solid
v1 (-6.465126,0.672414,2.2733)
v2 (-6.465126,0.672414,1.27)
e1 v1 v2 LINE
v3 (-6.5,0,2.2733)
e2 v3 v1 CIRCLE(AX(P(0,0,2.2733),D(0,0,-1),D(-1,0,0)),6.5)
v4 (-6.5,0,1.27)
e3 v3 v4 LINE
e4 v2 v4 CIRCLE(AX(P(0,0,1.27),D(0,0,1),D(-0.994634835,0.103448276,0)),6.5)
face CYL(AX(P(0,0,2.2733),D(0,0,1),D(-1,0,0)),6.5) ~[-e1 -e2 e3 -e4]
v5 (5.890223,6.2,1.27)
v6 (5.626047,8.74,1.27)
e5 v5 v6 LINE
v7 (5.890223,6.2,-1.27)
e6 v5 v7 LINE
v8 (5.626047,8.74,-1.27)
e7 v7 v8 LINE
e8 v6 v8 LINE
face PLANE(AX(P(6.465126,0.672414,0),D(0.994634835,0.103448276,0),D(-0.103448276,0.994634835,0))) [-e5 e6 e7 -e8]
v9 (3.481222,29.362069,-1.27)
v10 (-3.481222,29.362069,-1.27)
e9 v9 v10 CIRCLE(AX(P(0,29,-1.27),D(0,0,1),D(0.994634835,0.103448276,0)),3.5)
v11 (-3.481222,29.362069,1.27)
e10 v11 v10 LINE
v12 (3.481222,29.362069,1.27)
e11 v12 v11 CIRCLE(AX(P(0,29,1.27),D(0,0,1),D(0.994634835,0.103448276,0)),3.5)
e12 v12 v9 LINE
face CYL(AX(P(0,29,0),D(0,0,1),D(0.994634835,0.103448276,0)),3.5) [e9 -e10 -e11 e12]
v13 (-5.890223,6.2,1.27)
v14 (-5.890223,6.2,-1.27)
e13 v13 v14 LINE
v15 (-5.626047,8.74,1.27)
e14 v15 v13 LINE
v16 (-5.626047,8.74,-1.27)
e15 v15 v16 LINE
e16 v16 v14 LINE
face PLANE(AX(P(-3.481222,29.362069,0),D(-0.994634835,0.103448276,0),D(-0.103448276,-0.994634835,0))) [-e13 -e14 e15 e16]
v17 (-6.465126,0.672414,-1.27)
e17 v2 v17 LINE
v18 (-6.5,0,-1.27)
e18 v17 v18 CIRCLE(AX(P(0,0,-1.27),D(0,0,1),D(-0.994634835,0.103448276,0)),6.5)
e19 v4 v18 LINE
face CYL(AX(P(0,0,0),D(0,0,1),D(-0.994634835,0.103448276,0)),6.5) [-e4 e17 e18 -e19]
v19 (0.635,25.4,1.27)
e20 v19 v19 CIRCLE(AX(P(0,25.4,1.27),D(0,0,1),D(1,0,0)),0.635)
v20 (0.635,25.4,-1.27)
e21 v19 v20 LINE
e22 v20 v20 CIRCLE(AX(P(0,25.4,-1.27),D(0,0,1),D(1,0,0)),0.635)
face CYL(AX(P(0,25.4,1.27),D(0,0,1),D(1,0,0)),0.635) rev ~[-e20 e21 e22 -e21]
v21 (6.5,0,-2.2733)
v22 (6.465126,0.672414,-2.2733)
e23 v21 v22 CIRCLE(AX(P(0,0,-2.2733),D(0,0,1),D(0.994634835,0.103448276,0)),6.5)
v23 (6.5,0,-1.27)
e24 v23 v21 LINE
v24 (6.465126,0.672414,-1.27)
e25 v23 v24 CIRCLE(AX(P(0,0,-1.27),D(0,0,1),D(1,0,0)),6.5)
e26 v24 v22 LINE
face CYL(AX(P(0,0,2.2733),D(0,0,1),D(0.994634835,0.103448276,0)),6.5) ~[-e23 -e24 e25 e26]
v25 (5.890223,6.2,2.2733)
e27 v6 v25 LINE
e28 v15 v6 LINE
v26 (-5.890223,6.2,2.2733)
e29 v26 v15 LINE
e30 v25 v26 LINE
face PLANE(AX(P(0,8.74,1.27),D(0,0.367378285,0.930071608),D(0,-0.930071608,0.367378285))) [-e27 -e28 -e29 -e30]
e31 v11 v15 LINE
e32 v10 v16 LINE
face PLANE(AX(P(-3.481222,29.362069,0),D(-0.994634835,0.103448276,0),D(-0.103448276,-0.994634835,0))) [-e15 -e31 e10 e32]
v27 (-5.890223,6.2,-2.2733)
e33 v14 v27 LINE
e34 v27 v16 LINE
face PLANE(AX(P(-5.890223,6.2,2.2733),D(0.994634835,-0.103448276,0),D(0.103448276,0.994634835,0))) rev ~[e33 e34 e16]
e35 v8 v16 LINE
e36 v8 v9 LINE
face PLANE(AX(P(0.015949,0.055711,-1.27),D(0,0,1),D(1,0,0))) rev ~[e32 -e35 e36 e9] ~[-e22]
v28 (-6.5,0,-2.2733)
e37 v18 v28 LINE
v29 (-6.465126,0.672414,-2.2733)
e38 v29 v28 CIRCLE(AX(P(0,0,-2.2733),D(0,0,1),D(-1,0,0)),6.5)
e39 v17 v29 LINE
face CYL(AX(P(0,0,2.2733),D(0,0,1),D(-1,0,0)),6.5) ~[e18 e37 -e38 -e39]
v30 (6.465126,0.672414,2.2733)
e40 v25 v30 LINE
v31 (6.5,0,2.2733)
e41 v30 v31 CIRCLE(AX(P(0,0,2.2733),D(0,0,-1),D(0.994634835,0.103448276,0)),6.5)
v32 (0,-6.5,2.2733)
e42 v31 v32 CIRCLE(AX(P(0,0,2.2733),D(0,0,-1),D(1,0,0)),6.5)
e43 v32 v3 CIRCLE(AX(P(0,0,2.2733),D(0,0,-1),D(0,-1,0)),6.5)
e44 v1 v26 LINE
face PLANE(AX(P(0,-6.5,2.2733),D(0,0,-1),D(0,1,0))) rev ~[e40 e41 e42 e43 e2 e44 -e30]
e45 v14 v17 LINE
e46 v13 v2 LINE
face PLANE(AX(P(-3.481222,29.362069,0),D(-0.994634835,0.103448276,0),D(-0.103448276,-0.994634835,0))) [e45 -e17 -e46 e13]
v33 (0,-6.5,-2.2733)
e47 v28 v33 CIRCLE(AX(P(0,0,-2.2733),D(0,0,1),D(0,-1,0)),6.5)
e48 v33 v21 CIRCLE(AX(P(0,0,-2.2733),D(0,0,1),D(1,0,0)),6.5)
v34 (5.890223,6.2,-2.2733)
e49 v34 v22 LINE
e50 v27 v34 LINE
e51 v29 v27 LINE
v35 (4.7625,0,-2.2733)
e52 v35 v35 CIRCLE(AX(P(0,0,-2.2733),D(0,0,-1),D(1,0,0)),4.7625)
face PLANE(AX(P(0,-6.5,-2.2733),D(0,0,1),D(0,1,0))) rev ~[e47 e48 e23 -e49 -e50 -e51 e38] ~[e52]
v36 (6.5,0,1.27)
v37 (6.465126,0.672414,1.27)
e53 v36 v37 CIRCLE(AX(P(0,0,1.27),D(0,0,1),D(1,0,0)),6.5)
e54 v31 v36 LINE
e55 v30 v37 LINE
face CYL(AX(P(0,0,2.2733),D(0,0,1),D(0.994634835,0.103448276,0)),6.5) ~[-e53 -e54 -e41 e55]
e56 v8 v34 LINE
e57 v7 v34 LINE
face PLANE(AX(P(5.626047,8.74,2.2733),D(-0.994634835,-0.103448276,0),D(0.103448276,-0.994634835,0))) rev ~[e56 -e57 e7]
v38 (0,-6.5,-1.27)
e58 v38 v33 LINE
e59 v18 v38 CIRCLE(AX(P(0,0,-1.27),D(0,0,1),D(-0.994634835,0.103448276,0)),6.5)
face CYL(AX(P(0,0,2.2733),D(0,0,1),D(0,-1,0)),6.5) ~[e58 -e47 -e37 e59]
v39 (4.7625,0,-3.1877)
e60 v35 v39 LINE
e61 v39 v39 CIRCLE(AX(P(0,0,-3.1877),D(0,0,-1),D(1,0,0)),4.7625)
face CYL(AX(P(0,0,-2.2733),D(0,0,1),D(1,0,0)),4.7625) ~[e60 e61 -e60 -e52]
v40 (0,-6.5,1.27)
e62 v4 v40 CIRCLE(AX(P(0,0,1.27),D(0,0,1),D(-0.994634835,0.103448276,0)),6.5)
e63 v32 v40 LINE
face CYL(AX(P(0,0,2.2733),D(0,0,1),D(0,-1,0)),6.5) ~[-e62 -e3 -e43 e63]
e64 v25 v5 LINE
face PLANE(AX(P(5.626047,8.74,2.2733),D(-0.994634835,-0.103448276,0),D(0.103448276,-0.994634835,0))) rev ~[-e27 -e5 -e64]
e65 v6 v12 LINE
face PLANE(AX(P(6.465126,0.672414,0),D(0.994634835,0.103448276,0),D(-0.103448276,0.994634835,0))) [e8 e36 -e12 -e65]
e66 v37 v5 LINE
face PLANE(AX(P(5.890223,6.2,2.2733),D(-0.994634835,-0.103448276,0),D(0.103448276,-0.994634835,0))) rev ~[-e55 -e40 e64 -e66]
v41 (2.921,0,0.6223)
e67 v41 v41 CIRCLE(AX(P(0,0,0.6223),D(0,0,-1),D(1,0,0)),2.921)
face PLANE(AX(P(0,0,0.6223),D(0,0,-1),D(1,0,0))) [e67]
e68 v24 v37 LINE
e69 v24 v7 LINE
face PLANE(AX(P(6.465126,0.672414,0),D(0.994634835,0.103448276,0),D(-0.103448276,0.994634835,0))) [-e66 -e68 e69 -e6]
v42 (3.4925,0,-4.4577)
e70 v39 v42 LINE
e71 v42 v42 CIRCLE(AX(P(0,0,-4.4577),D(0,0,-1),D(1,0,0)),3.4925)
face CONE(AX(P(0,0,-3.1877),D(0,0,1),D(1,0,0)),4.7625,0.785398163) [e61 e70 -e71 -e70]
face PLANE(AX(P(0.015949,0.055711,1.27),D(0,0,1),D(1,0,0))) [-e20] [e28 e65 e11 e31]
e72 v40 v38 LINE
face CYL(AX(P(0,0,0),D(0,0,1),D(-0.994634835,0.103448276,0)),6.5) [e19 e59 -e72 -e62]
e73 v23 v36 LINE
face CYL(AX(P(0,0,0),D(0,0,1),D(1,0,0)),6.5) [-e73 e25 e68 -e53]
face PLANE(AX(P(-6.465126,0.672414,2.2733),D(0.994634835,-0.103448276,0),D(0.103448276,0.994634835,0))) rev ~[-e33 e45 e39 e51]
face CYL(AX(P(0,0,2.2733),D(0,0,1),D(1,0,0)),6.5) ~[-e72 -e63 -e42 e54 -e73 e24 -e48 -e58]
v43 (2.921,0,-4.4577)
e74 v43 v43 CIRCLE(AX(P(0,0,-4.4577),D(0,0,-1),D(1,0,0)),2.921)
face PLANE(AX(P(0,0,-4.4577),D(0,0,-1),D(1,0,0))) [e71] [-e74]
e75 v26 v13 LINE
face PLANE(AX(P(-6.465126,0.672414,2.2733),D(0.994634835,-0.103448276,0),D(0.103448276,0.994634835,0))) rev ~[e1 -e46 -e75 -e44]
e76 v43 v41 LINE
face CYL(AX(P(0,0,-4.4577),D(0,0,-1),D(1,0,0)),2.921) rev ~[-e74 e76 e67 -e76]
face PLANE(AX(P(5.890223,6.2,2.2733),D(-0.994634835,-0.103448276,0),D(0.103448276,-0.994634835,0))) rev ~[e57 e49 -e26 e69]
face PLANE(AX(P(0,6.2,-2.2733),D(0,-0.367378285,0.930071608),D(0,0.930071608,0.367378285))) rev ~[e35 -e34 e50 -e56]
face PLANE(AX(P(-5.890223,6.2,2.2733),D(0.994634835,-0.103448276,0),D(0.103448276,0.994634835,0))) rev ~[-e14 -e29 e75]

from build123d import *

# Parameters (mm, degrees)
F1_DEPTH  = 1.27
F2_W      = 12.7
F2_H      = 1.0033
F3_DEPTH  = 6.5
F5_DEPTH  = 4.5476
F6_R      = 4.7625
F7_DEPTH  = 2.1844
F8_SIZE   = 1.27
F9_R      = 2.921
F10_DEPTH = 5.08
F11_R     = 0.635
F12_DEPTH = 25.4


# Not quite as in the source:
# - after a boolean that leaves OpenCascade's solid faulty, fix() repairs it


with BuildPart() as f1:
    # F0 (on Top) → F1 (new body, symmetric)
    with BuildSketch(Plane.XY):
        with BuildLine():
            ThreePointArc((-6.465126425, 0.6724137931), (-0.3366587573, -6.4912757514), (6.5, 0))
            ThreePointArc((6.5, 0), (6.4912757514, 0.3366587573), (6.465126425, 0.6724137931))
            ThreePointArc((6.465126425, 0.6724137931), (0, 6.5), (-6.465126425, 0.6724137931))
        make_face()
        with BuildLine():
            ThreePointArc((-6.465126425, 0.6724137931), (0, 6.5), (6.465126425, 0.6724137931))
            Line((6.465126425, 0.6724137931), (3.4812219211, 29.3620689655))
            ThreePointArc((3.4812219211, 29.3620689655), (3.4953023277, 29.1812777924), (3.5, 29))
            ThreePointArc((3.5, 29), (-0.1812777924, 25.5046976723), (-3.4812219211, 29.3620689655))
            Line((-3.4812219211, 29.3620689655), (-6.465126425, 0.6724137931))
        make_face()
        with BuildLine():
            ThreePointArc((3.5, 29), (3.4953023277, 29.1812777924), (3.4812219211, 29.3620689655))
            ThreePointArc((3.4812219211, 29.3620689655), (0, 32.5), (-3.4812219211, 29.3620689655))
            ThreePointArc((-3.4812219211, 29.3620689655), (-0.1812777924, 25.5046976723), (3.5, 29))
        make_face()
    extrude(amount=F1_DEPTH, both=True)

    # F2 (on Right) → F3 (join, symmetric)
    with BuildSketch(Plane.YZ):
        with Locations((-0.15, -1.77165)):
            Rectangle(F2_W, F2_H)
        with Locations((-0.15, 1.77165)):
            Rectangle(F2_W, F2_H)
        Polygon((8.74, 1.27), (6.2, 2.2733), (6.2, 1.27), align=None)
        Polygon((8.74, -1.27), (6.2, -1.27), (6.2, -2.2733), align=None)
    extrude(amount=F3_DEPTH, both=True)

    # F4 (on face) → F5 (cut, through all)
    with BuildSketch(Plane.XY.offset(2.2733)):
        Polygon((5.6260467402, 8.74), (5.8902227087, 6.2), (6.5, 6.2), (6.5, 8.74), align=None)
        with BuildLine():
            Line((6.5, 6.2), (5.8902227087, 6.2))
            Line((5.8902227087, 6.2), (6.465126425, 0.6724137931))
            ThreePointArc((6.465126425, 0.6724137931), (6.4912757514, 0.3366587573), (6.5, 0))
            Line((6.5, 0), (6.5, 6.2))
        make_face()
        with BuildLine():
            ThreePointArc((6.5, 0), (4.5961940777, -4.5961940777), (0, -6.5))
            Line((0, -6.5), (6.5, -6.5))
            Line((6.5, -6.5), (6.5, 0))
        make_face()
        with BuildLine():
            ThreePointArc((0, -6.5), (-4.5961940777, -4.5961940777), (-6.5, 0))
            Line((-6.5, 0), (-6.5, -6.5))
            Line((-6.5, -6.5), (0, -6.5))
        make_face()
        Polygon((-6.5, 6.2), (-5.8902227087, 6.2), (-5.6260467402, 8.74), (-6.5, 8.74), align=None)
        with BuildLine():
            ThreePointArc((-6.5, 0), (-6.4912757514, 0.3366587573), (-6.465126425, 0.6724137931))
            Line((-6.465126425, 0.6724137931), (-5.8902227087, 6.2))
            Line((-5.8902227087, 6.2), (-6.5, 6.2))
            Line((-6.5, 6.2), (-6.5, 0))
        make_face()
    extrude(amount=-F5_DEPTH, mode=Mode.SUBTRACT)

    add(f1.part.fix(), mode=Mode.REPLACE)

    # F6 (on face) → F7 (join)
    with BuildSketch(Plane(origin=(0, 0, -2.2733), x_dir=(1, 0, 0), z_dir=(0, 0, -1))):
        Circle(F6_R)
    extrude(amount=F7_DEPTH)

    # F8
    f8_edges = [f1.edges().sort_by_distance(p)[0] for p in [
        (-4.7625, 0, -4.4577),
    ]]
    chamfer(f8_edges, length=F8_SIZE)

    # F9 (on face) → F10 (cut)
    with BuildSketch(Plane(origin=(0, 0, -4.4577), x_dir=(1, 0, 0), z_dir=(0, 0, -1))):
        Circle(F9_R)
    extrude(amount=-F10_DEPTH, mode=Mode.SUBTRACT)

    add(f1.part.fix(), mode=Mode.REPLACE)

    # F11 (on face) → F12 (cut)
    with BuildSketch(Plane.XY.offset(1.27)):
        with Locations((0, 25.4)):
            Circle(F11_R)
    extrude(amount=-F12_DEPTH, mode=Mode.SUBTRACT)


solid = f1.part
